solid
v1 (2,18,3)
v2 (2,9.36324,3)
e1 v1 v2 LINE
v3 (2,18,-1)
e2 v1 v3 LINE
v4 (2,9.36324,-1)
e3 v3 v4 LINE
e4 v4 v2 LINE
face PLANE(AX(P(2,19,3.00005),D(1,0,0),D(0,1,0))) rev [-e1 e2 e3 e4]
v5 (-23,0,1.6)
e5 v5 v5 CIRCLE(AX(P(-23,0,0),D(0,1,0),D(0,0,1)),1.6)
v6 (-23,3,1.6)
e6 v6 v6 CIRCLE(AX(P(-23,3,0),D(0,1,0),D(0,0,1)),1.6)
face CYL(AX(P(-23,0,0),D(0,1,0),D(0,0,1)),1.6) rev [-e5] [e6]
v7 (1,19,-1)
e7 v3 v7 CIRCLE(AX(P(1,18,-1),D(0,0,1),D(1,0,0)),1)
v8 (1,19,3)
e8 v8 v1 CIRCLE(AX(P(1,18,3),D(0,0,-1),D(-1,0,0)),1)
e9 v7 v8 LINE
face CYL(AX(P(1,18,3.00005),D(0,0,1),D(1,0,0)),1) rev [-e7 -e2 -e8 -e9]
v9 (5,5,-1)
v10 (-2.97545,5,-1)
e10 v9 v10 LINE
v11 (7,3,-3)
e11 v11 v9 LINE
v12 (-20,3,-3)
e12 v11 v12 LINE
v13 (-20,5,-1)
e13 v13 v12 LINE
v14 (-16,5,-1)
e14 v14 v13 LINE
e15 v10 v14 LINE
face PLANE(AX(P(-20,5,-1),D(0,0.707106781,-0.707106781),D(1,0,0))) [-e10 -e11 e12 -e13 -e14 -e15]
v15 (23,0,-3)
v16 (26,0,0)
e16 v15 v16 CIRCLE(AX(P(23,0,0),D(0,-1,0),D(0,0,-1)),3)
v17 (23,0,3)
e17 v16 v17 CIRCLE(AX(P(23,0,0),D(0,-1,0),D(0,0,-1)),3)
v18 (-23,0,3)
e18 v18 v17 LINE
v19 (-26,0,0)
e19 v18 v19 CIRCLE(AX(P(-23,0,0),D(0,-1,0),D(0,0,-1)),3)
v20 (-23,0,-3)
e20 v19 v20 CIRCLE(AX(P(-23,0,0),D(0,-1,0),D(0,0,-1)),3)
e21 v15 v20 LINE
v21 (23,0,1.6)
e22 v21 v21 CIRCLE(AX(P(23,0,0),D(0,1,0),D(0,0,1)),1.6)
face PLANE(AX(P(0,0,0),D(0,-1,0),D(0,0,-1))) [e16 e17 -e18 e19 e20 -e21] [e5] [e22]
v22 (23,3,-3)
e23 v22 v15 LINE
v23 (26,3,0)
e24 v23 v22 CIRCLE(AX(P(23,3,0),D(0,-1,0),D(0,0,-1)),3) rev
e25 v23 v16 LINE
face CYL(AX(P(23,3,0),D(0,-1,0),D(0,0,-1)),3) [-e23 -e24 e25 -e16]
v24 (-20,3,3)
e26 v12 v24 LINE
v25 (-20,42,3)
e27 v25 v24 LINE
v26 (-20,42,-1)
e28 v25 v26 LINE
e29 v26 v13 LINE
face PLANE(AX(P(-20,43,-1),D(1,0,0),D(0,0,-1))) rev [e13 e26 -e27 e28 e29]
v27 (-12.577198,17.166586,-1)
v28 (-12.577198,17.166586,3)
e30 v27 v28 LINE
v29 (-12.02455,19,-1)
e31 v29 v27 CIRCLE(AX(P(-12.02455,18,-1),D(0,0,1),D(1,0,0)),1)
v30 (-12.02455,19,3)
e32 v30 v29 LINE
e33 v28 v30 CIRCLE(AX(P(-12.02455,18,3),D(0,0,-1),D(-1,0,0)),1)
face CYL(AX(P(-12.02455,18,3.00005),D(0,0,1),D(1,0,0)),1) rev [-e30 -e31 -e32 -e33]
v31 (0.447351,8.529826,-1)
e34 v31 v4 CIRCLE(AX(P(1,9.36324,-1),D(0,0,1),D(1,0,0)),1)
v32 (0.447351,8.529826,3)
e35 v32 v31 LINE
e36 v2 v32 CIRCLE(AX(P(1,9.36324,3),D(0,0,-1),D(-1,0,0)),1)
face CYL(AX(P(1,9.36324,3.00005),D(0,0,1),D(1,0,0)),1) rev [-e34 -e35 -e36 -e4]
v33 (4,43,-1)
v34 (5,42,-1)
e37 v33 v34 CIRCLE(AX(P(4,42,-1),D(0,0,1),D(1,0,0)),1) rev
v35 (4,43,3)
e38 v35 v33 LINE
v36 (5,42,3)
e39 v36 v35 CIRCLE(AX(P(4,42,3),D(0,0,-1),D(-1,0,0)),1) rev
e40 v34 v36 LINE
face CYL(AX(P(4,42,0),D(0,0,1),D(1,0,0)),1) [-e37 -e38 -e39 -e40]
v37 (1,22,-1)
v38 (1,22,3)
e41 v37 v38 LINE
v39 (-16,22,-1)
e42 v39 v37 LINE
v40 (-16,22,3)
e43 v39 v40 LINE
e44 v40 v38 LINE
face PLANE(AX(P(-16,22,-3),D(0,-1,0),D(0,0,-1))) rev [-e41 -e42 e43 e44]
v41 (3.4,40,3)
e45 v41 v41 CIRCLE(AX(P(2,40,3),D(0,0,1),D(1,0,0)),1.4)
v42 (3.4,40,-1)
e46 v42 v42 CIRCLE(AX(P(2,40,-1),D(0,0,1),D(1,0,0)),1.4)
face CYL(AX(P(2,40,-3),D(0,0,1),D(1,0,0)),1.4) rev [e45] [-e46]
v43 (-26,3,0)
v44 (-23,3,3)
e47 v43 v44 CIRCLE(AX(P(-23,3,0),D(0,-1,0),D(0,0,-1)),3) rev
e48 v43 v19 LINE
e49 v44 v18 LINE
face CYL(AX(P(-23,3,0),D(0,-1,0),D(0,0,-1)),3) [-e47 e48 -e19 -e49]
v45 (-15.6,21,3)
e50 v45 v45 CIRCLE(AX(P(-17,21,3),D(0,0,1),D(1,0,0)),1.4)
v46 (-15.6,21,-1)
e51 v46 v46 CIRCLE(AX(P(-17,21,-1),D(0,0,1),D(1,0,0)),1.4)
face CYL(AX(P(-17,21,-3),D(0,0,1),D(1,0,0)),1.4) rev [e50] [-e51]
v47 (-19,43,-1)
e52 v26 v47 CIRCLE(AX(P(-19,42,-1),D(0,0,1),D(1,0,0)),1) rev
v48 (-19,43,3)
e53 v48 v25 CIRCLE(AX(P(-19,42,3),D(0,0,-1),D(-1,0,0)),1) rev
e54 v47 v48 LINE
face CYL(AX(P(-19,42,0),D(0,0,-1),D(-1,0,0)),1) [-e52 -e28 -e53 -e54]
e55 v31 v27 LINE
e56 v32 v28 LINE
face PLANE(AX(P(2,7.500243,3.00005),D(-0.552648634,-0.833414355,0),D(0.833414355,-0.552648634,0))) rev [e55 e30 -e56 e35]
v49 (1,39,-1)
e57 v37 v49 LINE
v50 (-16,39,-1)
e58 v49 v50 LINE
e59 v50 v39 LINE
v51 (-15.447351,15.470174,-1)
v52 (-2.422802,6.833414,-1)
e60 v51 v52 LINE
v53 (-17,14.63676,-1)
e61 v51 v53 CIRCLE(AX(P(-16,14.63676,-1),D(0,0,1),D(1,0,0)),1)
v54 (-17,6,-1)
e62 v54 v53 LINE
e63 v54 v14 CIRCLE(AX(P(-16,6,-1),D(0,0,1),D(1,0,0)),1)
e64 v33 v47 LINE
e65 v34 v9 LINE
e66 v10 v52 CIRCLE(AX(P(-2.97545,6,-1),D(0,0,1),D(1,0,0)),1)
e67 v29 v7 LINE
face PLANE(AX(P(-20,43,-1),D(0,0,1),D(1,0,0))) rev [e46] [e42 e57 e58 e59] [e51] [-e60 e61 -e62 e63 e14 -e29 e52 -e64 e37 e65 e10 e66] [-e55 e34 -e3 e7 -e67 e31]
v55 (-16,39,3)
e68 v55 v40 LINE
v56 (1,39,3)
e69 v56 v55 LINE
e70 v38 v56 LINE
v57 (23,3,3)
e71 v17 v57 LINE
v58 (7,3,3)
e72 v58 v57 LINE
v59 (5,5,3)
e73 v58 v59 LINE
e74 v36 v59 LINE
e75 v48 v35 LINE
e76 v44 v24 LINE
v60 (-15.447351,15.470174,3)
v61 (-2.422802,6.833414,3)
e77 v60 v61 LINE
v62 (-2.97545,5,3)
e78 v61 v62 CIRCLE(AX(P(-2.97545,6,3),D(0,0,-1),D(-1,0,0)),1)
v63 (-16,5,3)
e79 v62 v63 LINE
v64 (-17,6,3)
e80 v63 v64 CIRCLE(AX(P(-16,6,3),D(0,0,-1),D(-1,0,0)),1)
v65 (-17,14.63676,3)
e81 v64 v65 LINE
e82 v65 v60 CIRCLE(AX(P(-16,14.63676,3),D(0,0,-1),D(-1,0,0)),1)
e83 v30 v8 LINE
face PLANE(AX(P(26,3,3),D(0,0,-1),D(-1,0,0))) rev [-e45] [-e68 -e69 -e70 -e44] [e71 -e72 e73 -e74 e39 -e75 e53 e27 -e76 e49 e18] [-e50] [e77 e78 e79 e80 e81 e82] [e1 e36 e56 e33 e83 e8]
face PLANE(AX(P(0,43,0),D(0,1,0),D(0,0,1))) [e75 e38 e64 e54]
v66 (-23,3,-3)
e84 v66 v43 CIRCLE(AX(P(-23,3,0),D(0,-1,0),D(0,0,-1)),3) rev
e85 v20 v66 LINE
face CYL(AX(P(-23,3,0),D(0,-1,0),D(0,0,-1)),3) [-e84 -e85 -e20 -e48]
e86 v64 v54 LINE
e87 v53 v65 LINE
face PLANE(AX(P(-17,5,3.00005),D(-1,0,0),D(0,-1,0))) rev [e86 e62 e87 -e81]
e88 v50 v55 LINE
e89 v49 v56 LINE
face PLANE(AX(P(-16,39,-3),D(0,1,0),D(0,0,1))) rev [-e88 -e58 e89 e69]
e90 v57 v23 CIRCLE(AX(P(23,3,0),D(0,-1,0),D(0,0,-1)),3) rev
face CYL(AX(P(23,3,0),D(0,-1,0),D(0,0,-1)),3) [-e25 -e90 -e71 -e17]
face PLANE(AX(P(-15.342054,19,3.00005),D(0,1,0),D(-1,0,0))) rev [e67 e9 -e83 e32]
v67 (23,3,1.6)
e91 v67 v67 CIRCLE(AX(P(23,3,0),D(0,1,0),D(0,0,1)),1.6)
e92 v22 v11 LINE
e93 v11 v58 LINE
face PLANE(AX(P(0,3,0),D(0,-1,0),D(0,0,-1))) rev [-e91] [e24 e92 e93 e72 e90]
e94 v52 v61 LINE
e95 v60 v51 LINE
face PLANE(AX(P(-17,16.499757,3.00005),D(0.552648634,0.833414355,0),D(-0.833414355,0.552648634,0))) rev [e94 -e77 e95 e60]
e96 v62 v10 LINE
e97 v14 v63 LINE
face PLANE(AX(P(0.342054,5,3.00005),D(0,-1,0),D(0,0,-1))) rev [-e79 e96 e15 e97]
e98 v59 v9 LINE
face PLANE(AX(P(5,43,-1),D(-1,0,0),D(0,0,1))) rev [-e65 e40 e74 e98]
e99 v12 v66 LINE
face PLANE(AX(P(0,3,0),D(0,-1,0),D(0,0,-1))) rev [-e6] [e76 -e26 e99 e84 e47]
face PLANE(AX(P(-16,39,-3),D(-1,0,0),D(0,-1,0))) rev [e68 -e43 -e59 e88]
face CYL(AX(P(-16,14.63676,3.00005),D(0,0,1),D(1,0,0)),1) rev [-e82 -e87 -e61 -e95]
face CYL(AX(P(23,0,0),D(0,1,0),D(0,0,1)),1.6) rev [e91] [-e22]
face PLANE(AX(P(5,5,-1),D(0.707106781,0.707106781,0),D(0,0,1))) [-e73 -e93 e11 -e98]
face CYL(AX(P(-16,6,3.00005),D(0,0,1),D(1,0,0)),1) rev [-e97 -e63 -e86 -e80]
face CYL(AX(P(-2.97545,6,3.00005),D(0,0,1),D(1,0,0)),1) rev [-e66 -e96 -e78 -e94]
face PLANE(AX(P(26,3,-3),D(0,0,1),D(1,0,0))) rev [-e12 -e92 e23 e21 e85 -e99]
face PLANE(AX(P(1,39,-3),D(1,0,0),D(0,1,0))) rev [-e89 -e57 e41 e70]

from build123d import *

# Parameters (mm, degrees)
SKETCH1_W           = 52
SKETCH1_H           = 6
BOSS_EXTRUDE1_DEPTH = 3
SKETCH2_W           = 25
SKETCH2_H           = 4
BOSS_EXTRUDE2_DEPTH = 40
SKETCH3_R           = 1.6
CUT_EXTRUDE1_DEPTH  = 48.801673611
FILLET1_R           = 3
SKETCH5_R           = 1.4
CUT_EXTRUDE3_DEPTH  = 51.606323716
SKETCH6_W           = 17
SKETCH6_H           = 17
CUT_EXTRUDE4_DEPTH  = 51.606323716
CHAMFER1_SIZE       = 2
CUT_EXTRUDE5_DEPTH  = 51.408332645
FILLET2_R           = 1


with BuildPart() as part:
    # Sketch1 → Boss-Extrude1 (new body)
    with BuildSketch(Plane(origin=(0, 0, 0), x_dir=(1, 0, 0), z_dir=(0, 1, 0))):
        Rectangle(SKETCH1_W, SKETCH1_H)
    extrude(amount=BOSS_EXTRUDE1_DEPTH)

    # Sketch2 → Boss-Extrude2 (add)
    with BuildSketch(Plane(origin=(0, 3, 0), x_dir=(1, 0, 0), z_dir=(0, 1, 0))):
        with Locations((-7.5, -1)):
            Rectangle(SKETCH2_W, SKETCH2_H)
    extrude(amount=BOSS_EXTRUDE2_DEPTH)

    # Sketch3 → Cut-Extrude1 (cut, through all)
    with BuildSketch(Plane(origin=(0, 3, 0), x_dir=(1, 0, 0), z_dir=(0, 1, 0))):
        with Locations(Location((-23, 0, 0), (0, 0, 270))):
            Circle(SKETCH3_R)
        with Locations(Location((23, 0, 0), (0, 0, 270))):
            Circle(SKETCH3_R)
    extrude(amount=-CUT_EXTRUDE1_DEPTH, mode=Mode.SUBTRACT)

    # Fillet1
    fillet1_edges = [part.edges().sort_by_distance(p)[0] for p in [
        (26, 1.5, -3),
        (26, 1.5, 3),
        (-26, 1.5, 3),
        (-26, 1.5, -3),
    ]]
    fillet(fillet1_edges, radius=FILLET1_R - 0.0001)  # a hair under: the kernel refuses the full size

    # Sketch5 → Cut-Extrude3 (cut, through all)
    with BuildSketch(Plane.XY.offset(3)):
        with Locations((2, 40)):
            Circle(SKETCH5_R)
        with Locations((-17, 21)):
            Circle(SKETCH5_R)
    extrude(amount=-CUT_EXTRUDE3_DEPTH, mode=Mode.SUBTRACT)

    # Sketch6 → Cut-Extrude4 (cut, through all)
    with BuildSketch(Plane.XY.offset(3)):
        with Locations((-7.5, 30.5)):
            Rectangle(SKETCH6_W, SKETCH6_H)
    extrude(amount=-CUT_EXTRUDE4_DEPTH, mode=Mode.SUBTRACT)

    # Chamfer1
    chamfer1_edges = [part.edges().sort_by_distance(p)[0] for p in [
        (5, 3, 1),
        (-7.5, 3, -1),
    ]]
    chamfer(chamfer1_edges, length=CHAMFER1_SIZE - 0.0001)  # a hair under: the kernel refuses the full size

    # Sketch7 → Cut-Extrude5 (cut, through all)
    with BuildSketch(Plane(origin=(0, 0, -1), x_dir=(-1, 0, 0), z_dir=(0, 0, -1))):
        Polygon((-2, 19), (-2, 7.500243065), (15.342054098, 19), align=None)
        Polygon((17, 16.499756935), (-0.342054098, 5), (17, 5), align=None)
    extrude(amount=-CUT_EXTRUDE5_DEPTH, mode=Mode.SUBTRACT)

    # Fillet2
    fillet2_edges = [part.edges().sort_by_distance(p)[0] for p in [
        (-17, 5, 1),
        (-17, 16.499756935, 1),
        (0.342054098, 5, 1),
        (2, 7.500243065, 1),
        (2, 19, 1),
        (-15.342054098, 19, 1),
        (5, 43, 1),
        (-20, 43, 1),
    ]]
    fillet(fillet2_edges, radius=FILLET2_R)


solid = part.part
